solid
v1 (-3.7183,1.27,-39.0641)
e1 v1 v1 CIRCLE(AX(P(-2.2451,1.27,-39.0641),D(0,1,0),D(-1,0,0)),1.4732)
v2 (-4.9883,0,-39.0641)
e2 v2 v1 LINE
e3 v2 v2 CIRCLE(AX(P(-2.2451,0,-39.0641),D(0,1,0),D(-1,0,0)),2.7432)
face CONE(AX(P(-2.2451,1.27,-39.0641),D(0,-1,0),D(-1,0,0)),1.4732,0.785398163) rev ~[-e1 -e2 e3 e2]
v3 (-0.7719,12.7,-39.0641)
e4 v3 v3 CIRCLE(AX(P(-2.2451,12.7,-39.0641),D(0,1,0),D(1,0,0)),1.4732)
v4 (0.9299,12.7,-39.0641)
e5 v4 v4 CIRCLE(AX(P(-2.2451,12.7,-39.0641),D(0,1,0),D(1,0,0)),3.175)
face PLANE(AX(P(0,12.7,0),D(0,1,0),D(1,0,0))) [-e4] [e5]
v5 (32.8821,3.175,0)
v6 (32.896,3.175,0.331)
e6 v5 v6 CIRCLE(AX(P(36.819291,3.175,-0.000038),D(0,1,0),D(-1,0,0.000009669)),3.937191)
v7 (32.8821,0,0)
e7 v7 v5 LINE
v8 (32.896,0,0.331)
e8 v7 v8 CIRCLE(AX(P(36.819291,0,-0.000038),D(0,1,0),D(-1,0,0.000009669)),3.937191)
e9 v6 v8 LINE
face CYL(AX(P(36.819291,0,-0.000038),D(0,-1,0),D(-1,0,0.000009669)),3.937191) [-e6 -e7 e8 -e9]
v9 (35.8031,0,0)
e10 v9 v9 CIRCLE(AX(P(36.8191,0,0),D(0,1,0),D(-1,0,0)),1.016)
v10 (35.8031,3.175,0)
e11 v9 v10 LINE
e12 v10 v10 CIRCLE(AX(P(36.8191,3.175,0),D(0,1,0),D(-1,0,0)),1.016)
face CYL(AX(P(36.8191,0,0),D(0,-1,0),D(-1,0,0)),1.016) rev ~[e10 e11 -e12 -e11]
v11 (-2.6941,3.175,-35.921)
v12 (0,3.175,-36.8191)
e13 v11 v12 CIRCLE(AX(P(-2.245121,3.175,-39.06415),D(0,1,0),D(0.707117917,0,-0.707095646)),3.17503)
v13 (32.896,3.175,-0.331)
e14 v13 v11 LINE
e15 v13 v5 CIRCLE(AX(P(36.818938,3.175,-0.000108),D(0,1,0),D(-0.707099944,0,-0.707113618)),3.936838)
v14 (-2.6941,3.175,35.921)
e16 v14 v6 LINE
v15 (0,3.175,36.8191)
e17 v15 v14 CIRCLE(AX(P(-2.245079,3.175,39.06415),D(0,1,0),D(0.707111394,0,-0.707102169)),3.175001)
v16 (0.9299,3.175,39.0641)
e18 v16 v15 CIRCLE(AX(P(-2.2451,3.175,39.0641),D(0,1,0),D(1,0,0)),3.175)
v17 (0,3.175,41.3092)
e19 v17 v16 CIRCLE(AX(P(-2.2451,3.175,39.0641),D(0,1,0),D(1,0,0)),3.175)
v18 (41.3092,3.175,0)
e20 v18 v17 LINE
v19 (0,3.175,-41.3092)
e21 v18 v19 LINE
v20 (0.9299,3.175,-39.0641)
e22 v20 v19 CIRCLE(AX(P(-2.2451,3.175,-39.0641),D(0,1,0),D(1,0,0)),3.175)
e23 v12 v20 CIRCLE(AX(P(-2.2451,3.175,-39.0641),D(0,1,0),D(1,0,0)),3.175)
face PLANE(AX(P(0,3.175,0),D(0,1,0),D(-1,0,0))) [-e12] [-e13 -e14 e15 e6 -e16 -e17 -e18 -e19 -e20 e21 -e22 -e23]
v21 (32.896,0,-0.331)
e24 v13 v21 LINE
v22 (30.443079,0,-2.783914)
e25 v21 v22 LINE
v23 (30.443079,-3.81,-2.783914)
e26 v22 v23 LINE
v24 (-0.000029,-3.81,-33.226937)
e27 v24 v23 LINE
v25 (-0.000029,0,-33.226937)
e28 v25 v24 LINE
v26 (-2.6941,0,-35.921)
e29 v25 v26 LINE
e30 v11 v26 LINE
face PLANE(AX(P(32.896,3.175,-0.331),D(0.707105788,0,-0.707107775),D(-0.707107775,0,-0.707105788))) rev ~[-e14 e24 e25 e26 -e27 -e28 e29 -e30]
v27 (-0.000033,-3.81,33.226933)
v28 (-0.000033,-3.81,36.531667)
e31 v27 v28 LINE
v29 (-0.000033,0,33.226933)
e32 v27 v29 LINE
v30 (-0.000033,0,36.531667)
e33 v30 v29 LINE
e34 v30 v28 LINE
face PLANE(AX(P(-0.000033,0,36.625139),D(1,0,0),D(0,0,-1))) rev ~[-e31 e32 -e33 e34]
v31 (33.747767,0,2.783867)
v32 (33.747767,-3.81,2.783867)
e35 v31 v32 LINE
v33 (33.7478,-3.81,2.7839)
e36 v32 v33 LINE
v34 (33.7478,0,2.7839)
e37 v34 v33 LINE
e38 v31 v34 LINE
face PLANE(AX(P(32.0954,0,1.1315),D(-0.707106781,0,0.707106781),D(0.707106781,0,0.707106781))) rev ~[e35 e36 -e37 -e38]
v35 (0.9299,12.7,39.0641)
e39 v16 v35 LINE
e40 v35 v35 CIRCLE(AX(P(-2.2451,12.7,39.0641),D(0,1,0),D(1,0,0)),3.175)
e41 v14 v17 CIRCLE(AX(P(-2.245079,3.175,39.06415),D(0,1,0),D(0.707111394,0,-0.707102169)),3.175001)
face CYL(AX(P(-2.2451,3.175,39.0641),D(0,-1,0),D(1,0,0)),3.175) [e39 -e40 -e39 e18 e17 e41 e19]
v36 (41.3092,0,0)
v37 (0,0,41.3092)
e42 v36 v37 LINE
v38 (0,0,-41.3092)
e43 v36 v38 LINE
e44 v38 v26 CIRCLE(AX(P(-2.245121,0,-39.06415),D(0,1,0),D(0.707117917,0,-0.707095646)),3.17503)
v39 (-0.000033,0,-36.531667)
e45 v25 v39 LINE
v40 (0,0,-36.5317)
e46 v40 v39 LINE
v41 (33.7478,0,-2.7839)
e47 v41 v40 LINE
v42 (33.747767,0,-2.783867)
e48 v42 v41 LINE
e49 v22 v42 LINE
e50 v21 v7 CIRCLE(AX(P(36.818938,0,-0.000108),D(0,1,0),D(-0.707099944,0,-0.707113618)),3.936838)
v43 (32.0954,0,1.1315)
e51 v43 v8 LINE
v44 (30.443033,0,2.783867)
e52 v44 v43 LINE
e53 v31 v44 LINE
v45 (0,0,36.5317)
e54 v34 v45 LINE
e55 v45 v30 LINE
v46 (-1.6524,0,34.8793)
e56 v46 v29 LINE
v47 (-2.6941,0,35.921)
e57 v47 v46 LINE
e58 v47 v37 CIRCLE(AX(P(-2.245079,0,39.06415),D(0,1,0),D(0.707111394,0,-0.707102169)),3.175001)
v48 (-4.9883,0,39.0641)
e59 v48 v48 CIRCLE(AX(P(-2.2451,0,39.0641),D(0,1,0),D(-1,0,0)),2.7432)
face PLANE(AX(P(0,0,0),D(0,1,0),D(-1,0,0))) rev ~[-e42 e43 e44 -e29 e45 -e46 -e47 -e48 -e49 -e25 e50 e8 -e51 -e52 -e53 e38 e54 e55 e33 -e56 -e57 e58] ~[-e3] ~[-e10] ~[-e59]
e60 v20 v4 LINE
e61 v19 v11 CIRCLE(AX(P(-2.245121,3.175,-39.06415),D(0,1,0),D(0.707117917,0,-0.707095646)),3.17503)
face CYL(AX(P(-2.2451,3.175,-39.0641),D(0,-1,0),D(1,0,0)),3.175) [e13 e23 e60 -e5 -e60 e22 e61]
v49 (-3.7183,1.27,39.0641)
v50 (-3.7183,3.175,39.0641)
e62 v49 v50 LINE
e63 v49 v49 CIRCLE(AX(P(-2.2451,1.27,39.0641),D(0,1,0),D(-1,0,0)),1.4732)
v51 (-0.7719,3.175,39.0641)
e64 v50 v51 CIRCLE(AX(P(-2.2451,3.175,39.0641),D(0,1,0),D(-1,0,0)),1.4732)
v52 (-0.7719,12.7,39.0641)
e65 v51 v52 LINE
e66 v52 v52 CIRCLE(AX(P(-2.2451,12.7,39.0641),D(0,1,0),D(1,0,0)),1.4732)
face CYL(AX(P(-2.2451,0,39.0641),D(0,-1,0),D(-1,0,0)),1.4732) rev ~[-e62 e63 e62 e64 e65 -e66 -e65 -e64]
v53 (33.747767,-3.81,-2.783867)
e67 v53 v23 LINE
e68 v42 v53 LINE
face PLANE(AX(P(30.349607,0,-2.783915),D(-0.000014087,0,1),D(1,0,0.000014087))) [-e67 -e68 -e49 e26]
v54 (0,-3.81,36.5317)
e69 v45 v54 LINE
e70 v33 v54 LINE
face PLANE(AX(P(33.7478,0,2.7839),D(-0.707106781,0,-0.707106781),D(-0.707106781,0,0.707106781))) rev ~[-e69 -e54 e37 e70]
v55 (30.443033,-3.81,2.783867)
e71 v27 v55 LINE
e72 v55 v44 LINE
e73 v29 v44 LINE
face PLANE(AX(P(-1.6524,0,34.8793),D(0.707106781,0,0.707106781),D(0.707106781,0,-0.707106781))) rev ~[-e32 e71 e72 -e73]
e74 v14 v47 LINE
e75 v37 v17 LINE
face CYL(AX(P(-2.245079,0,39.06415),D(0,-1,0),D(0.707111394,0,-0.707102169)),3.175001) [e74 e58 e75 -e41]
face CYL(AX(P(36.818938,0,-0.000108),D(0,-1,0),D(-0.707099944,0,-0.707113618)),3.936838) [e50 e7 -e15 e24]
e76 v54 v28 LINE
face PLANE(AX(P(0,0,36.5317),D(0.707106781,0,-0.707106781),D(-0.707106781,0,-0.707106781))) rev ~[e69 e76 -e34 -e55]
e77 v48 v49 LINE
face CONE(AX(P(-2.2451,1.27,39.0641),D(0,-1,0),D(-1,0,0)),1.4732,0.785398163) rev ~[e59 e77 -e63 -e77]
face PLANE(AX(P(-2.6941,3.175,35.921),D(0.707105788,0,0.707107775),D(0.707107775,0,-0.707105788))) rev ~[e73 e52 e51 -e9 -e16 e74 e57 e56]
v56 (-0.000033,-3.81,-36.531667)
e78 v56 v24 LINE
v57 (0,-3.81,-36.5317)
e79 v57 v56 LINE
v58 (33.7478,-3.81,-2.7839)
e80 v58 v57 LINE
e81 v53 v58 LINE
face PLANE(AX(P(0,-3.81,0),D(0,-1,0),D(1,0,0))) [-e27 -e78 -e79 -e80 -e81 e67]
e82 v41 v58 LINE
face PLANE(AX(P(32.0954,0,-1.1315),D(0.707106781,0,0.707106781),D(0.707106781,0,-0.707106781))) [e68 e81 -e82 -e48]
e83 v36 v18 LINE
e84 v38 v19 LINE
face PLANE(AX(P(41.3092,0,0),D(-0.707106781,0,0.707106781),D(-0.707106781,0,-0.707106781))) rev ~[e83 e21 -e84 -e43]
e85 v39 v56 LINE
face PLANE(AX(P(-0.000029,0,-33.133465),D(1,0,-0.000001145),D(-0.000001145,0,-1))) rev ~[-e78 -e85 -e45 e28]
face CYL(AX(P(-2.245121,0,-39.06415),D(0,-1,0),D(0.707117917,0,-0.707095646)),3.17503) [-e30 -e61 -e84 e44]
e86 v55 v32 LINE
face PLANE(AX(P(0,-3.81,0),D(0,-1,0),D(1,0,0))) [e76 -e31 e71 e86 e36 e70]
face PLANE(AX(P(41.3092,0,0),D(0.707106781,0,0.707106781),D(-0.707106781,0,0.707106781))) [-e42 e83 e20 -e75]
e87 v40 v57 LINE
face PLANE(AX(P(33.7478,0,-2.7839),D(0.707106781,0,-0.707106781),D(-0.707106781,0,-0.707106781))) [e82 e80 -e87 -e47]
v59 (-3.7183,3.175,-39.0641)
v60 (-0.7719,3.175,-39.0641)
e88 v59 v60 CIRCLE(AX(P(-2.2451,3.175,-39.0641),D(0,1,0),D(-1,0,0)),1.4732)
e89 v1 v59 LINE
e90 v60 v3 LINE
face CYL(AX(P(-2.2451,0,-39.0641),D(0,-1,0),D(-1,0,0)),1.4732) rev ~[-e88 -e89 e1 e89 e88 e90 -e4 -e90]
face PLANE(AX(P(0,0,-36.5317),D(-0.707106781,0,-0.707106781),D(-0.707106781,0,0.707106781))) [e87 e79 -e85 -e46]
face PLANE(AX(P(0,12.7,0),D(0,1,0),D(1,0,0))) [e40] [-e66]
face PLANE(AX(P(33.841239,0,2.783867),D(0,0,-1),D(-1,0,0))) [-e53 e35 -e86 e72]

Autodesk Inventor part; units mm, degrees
ref_plane "YZ Plane" through (0, 0, 0) normal (1, 0, 0) x (0, 1, 0)
ref_plane "XZ Plane" through (0, 0, 0) normal (0, 1, 0) x (-1, 0, 0)
sketch "Sketch1" plane through (0, 0, 0) normal (0, 1, 0) x (-1, 0, 0)
  line L0 (-41.3092, 0) -> (0, 41.3092)
  circle A0 centre (-36.8191, 0) radius 1.016
  arc A1 (-32.8821, 0) -> (-34.0352, 2.7839) centre (-36.8191, 0) ccw
  line L1 (0, 41.3092) -> (2.2451, 39.0641)
  arc A2 (0, 36.8191) -> (0, 41.3092) centre (2.2451, 39.0641) ccw
  circle A3 centre (2.2451, 39.0641) radius 1.4732
  line L2 (0, 36.8191) -> (-34.0352, 2.7839)
  line L3 (0, 0) -> (-14.0183, 0)
  line L4 (-41.3092, 0) -> (0, -41.3092)
  circle A4 centre (-36.8191, 0) radius 1.016
  arc A5 (-34.0352, -2.7839) -> (-32.8821, 0) centre (-36.8191, 0) ccw
  line L5 (0, -41.3092) -> (2.2451, -39.0641)
  arc A6 (0, -41.3092) -> (0, -36.8191) centre (2.2451, -39.0641) ccw
  circle A7 centre (2.2451, -39.0641) radius 1.4732
  line L6 (0, -36.8191) -> (-34.0352, -2.7839)
  dimension "d0" = 3.175
  dimension "d1" = 58.42
  dimension "d2" = 45
  dimension "d3" = 2.9464
  dimension "d4" = 3.175
  dimension "d5" = 3.937
  dimension "d6" = 2.032
  dimension "d7" = 45
extrude "Extrusion1" add sketch "Sketch1" along normal blind 3.175
sketch "Sketch2" plane through (0, 3.175, 0) normal (0, 1, 0) x (1, 0, 0)
  circle A0 centre (-2.2451, -39.0641) radius 1.4732 projected
  circle A1 centre (-2.2451, -39.0641) radius 3.175
  circle A2 centre (-2.2451, 39.0641) radius 1.4732 projected
  circle A3 centre (-2.2451, 39.0641) radius 3.175
  point P0 (0, 0)
  dimension "d10" = 6.35
  dimension "d11" = 6.35
extrude "Extrusion2" add sketch "Sketch2" along normal blind 9.525
chamfer "Chamfer1" distance 1.27 angle 45 2 edges at (-0.7719, 0, 39.0641) (-0.7719, 0, -39.0641)
sketch "Sketch3" plane through (0, 3.175, 0) normal (0, 1, 0) x (1, 0, 0)
  arc A0 (0, -36.8191) -> (0, -41.3092) centre (-2.2451, -39.0641) ccw projected
  line L0 (34.0352, -2.7839) -> (0, -36.8191) projected
  arc A1 (34.0352, 2.7839) -> (34.0352, -2.7839) centre (36.8191, 0) ccw projected
  line L1 (0, 36.8191) -> (34.0352, 2.7839) projected
  arc A2 (0, 41.3092) -> (0, 36.8191) centre (-2.2451, 39.0641) ccw projected
  line L2 (-2.6941, -35.921) -> (32.896, -0.331)
  arc A3 (34.0352, 2.7839) -> (34.0352, -2.7839) centre (36.8191, 0) ccw projected
  line L3 (32.896, 0.331) -> (-2.6941, 35.921)
  point P0 (0, 0)
  dimension "d17" = 2.54
  dimension "d18" = 2.54
ref_plane "Work Plane1" through (0, -3.81, 0) normal (0, 1, 0) x (1, 0, 0)
extrude "Extrusion3" add sketch "Sketch3" against normal up to surface (3.175 mm away)
sketch "Sketch4" plane through (0, 0, 0) normal (0, -1, 0) x (1, 0, 0)
  line L0 (0, -36.8191) -> (34.0352, -2.7839) projected
  line L1 (0, 36.8191) -> (34.0352, 2.7839) projected
  line L2 (-2.6941, -35.921) -> (32.896, -0.331) projected
  line L3 (-1.6524, -34.8793) -> (32.0954, -1.1315)
  line L4 (32.0954, -1.1315) -> (33.7478, -2.7839)
  line L5 (33.7478, -2.7839) -> (0, -36.5317)
  line L6 (0, -36.5317) -> (-1.6524, -34.8793)
  line L7 (0, 0) -> (11.5163, 0)
  line L8 (-1.6524, 34.8793) -> (32.0954, 1.1315)
  line L9 (32.0954, 1.1315) -> (33.7478, 2.7839)
  line L10 (33.7478, 2.7839) -> (0, 36.5317)
  line L11 (0, 36.5317) -> (-1.6524, 34.8793)
  dimension "d22" = 0.2032
  dimension "d23" = 0.2032
  dimension "d24" = 0.2032
extrude "Extrusion4" add sketch "Sketch4" along normal up to surface (3.81 mm away)
chamfer "Chamfer2" distance 2.3368 angle 45 4 edges at (-1.6524, -1.905, -34.8793) (-1.6524, -1.905, 34.8793) (32.0954, -1.905, 1.1315) (32.0954, -1.905, -1.1315)
properties part number "WIDE SCREEN HOLDER 2SCREEN"
